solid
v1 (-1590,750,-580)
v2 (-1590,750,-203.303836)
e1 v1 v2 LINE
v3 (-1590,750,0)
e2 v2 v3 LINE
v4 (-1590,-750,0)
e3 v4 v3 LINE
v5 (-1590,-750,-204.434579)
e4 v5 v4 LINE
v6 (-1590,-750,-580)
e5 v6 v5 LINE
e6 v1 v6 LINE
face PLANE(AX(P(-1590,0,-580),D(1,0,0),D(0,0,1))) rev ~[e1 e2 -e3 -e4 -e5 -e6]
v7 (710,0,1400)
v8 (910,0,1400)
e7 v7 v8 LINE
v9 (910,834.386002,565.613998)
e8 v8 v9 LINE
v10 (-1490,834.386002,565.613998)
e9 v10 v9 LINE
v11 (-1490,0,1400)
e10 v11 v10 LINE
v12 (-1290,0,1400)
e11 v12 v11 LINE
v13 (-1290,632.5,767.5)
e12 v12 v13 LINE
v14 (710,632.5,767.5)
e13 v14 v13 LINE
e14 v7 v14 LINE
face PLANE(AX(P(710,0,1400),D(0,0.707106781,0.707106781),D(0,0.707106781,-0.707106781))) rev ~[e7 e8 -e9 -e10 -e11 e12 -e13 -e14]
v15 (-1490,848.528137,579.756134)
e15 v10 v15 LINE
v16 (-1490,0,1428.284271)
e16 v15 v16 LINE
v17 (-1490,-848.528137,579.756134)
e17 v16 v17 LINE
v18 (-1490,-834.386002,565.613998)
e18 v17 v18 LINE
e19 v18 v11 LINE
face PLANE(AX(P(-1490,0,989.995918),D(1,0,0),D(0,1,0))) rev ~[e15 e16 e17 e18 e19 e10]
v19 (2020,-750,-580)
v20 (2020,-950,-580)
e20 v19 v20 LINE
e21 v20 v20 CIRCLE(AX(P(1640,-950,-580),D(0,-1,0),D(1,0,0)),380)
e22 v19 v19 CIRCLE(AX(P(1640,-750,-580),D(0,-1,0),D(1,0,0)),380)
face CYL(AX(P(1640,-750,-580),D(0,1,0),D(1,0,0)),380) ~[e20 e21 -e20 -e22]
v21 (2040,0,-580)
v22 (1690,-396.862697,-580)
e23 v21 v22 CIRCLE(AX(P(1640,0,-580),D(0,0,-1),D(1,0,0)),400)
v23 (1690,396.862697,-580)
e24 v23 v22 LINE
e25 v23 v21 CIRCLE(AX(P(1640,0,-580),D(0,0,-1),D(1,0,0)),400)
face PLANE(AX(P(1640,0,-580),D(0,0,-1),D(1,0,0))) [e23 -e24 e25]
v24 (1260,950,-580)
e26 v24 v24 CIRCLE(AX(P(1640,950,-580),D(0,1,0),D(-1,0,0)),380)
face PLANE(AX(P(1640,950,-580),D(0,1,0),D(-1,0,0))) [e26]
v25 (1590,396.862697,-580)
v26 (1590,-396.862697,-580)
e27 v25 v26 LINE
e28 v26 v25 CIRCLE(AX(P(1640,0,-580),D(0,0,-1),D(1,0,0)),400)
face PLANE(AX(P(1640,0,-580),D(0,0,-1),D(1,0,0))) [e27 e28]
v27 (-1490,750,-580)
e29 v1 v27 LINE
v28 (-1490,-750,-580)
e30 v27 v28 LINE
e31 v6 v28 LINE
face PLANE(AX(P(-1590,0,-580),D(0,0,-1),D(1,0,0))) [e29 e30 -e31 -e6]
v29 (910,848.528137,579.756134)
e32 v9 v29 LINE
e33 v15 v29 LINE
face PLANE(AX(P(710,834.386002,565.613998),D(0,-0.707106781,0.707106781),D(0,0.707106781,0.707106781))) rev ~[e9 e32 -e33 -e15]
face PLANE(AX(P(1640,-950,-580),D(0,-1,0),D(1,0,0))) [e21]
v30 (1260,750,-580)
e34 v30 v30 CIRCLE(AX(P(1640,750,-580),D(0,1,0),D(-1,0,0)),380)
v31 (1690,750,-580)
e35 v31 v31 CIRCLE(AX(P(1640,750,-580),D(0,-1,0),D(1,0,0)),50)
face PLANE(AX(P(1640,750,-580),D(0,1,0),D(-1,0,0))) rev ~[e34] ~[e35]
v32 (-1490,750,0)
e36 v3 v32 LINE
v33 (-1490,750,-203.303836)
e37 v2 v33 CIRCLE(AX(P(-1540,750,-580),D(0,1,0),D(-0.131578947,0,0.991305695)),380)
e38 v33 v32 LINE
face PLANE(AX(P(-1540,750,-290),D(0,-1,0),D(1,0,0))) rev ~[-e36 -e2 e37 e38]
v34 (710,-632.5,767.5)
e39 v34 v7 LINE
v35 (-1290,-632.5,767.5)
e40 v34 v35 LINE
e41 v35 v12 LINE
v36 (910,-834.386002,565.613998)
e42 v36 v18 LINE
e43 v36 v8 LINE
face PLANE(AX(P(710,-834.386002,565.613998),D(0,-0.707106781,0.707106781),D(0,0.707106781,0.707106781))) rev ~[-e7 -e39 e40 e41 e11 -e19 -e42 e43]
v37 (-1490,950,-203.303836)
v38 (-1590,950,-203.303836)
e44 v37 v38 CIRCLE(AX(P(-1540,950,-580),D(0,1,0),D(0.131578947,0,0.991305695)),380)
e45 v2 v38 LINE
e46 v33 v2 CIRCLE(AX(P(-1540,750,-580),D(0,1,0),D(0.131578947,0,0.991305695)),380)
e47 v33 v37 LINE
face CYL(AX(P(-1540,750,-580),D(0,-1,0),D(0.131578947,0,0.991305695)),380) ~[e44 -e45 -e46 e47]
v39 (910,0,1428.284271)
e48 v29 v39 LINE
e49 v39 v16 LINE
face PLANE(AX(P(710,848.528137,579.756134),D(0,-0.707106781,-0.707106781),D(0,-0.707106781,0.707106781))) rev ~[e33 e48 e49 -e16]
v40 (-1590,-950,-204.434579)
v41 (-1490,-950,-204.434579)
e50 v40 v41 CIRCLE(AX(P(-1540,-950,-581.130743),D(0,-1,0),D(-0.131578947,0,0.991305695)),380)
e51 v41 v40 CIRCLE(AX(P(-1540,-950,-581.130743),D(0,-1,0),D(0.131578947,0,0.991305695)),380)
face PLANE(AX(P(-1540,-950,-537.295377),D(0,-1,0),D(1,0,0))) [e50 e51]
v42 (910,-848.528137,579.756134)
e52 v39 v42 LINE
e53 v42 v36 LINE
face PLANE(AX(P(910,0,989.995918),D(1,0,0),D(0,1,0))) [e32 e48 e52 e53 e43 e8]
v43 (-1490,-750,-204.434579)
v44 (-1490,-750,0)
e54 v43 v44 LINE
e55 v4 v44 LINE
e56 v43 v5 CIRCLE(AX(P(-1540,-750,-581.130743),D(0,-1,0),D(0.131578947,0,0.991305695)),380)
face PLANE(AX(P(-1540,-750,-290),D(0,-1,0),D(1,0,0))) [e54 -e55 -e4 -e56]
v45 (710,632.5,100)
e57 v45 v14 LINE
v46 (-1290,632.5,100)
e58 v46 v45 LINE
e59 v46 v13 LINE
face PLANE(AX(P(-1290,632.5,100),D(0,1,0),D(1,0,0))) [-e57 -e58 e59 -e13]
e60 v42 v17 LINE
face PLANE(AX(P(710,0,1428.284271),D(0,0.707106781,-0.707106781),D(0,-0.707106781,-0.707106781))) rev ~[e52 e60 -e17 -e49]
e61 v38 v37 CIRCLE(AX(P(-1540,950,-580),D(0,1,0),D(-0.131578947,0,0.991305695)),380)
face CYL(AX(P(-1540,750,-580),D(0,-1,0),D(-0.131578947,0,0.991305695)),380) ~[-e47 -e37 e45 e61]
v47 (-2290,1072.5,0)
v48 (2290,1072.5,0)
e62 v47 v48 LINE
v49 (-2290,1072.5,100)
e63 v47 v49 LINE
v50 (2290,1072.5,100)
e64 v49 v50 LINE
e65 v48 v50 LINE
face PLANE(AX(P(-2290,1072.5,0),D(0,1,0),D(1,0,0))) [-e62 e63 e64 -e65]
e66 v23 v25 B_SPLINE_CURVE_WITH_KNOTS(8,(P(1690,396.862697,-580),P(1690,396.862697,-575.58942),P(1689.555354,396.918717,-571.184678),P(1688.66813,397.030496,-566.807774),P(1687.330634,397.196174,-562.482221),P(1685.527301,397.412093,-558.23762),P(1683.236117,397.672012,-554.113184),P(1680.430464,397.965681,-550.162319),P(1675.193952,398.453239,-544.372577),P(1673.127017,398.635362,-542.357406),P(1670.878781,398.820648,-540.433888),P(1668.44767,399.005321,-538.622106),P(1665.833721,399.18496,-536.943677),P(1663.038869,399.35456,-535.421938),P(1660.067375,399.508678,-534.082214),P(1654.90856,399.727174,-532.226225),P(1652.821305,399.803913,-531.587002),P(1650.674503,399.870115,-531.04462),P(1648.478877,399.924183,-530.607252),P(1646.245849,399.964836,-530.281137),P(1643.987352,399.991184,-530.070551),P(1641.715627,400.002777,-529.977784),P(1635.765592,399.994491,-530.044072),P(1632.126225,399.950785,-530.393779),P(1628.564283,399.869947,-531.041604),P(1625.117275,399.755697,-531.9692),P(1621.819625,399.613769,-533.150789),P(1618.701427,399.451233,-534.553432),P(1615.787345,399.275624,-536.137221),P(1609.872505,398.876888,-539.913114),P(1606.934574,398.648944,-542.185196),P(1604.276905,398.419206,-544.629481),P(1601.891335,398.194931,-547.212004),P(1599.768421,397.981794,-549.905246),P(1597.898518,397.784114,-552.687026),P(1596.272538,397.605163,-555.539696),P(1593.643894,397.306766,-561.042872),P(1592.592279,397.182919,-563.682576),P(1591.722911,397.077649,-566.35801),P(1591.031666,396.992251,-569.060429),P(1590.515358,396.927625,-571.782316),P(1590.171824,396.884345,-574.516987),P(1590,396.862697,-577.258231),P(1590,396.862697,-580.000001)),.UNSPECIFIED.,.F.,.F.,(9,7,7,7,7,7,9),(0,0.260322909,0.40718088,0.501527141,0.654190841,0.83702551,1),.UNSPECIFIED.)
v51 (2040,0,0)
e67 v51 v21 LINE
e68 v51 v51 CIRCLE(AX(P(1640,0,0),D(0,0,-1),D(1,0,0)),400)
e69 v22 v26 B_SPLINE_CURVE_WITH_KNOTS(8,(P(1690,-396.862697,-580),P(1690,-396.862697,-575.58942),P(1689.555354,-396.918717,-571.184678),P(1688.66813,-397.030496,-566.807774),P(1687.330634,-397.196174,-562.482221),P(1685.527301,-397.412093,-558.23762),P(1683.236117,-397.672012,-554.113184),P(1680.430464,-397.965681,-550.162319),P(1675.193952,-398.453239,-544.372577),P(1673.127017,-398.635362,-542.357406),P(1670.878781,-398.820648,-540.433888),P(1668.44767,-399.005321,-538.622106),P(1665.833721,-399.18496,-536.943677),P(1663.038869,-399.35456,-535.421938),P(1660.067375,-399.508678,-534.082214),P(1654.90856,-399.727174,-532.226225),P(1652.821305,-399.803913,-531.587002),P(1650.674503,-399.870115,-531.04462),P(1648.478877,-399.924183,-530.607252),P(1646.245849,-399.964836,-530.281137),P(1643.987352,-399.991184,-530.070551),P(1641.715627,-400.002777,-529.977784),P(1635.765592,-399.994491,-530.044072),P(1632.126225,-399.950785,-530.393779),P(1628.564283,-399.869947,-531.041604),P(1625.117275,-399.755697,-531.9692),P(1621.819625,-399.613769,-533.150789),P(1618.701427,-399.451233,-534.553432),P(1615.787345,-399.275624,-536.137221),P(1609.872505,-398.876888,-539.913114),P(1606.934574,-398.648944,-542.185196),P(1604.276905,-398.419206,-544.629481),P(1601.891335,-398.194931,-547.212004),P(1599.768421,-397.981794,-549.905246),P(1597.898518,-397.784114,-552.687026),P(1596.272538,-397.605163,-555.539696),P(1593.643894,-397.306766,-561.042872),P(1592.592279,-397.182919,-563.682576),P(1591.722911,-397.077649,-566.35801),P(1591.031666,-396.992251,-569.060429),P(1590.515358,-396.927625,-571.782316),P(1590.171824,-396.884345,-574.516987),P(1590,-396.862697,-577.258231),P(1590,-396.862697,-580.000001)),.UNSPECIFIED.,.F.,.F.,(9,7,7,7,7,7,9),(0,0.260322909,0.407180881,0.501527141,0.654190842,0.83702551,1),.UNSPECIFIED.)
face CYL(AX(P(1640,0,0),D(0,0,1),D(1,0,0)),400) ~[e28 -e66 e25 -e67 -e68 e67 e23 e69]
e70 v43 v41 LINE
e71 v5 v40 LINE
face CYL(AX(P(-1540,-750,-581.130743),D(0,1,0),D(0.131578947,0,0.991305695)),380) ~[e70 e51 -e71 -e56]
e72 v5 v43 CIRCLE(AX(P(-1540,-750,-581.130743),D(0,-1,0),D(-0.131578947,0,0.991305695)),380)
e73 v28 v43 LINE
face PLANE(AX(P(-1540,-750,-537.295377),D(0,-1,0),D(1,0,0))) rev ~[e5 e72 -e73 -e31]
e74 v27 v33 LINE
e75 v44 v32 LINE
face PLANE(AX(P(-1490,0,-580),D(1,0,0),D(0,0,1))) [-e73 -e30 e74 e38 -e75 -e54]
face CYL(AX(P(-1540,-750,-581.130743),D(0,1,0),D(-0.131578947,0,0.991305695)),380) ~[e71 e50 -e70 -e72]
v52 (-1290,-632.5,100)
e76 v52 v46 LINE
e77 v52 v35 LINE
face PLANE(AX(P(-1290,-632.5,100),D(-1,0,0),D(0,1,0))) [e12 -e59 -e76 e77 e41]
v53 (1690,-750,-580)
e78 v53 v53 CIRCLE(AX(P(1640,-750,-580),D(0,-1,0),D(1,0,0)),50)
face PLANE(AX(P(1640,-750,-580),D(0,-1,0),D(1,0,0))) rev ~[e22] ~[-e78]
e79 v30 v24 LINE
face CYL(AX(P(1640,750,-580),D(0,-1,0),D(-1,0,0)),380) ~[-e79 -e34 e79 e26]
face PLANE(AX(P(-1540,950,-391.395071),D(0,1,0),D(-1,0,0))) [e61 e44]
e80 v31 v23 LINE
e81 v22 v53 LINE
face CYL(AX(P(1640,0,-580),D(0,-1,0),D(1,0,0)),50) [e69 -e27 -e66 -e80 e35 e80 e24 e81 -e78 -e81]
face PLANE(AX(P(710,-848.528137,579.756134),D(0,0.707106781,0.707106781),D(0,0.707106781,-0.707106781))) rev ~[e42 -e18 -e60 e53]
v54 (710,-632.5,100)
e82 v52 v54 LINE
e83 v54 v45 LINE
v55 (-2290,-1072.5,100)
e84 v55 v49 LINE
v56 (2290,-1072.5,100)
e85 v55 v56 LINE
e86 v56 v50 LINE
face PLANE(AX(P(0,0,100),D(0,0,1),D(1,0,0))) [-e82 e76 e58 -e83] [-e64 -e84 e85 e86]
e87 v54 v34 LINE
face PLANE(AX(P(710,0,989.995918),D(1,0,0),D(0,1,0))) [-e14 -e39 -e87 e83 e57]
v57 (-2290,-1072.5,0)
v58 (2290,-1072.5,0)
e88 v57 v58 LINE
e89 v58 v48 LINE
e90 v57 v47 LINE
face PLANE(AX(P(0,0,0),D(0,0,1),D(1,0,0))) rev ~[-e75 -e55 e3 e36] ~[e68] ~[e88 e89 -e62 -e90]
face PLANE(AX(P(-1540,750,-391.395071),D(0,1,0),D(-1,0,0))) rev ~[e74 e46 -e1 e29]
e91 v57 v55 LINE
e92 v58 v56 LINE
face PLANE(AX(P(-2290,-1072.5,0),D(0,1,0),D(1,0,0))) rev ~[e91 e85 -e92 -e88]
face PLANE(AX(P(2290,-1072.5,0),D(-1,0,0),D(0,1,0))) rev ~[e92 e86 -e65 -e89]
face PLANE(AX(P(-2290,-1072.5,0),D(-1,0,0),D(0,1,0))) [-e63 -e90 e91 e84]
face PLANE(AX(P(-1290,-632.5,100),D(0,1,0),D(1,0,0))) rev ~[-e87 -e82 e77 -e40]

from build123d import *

# Parameters (mm, degrees)
F0_W      = 4580
F0_H      = 2145
F1_DEPTH  = 100
F2_W      = 100
F2_H      = 580
F3_DEPTH  = 450
F4_DEPTH  = 750
F6_DEPTH  = 200
F8_DEPTH  = 200
F9_R      = 400
F10_DEPTH = 580
F11_R     = 50
F12_DEPTH = 750
F13_R     = 380
F13_R_2   = 50
F14_DEPTH = 200
F15_R     = 380
F15_R_2   = 50
F16_DEPTH = 200
F17_W     = 2000
F17_H     = 1265
F18_DEPTH = 2000
F20_DEPTH = 2000
F22_DEPTH = 2200
F23_DEPTH = 200


# Not quite as in the source:
# - a feature names something its author has since deleted; it is built from what else it names


with BuildPart() as f1:
    # F0 (on Top) → F1 (new body)
    with BuildSketch(Plane.XY):
        Rectangle(F0_W, F0_H)
    extrude(amount=F1_DEPTH)

    # F2 (on Front) → F3 (join, symmetric)
    with BuildSketch(Plane.XZ):
        with Locations((-1540, -290)):
            Rectangle(F2_W, F2_H)
    extrude(amount=F3_DEPTH, both=True)

    # F2 (on Front) → F4 (join, symmetric)
    with BuildSketch(Plane.XZ):
        with Locations((-1540, -290)):
            Rectangle(F2_W, F2_H)
    extrude(amount=F4_DEPTH, both=True)

    # F5 (on face) → F6 (join)
    with BuildSketch(Plane.XZ.offset(750)):
        with BuildLine():
            ThreePointArc((-1590, -204.43457899), (-1790.399680511, -866.9628615859), (-1160, -581.1307430267))
            ThreePointArc((-1160, -581.1307430267), (-1254.1678814409, -330.7310625158), (-1490, -204.43457899))
            Line((-1490, -204.43457899), (-1490, -580))
            Line((-1490, -580), (-1590, -580))
            Line((-1590, -580), (-1590, -204.43457899))
        make_face()
        with BuildLine():
            Line((-1490, -580), (-1490, -204.43457899))
            ThreePointArc((-1490, -204.43457899), (-1540, -201.1307430267), (-1590, -204.43457899))
            Line((-1590, -204.43457899), (-1590, -580))
            Line((-1590, -580), (-1490, -580))
        make_face()
    extrude(amount=F6_DEPTH)

    # F7 (on face) → F8 (join)
    with BuildSketch(Plane(origin=(0, 750, 0), x_dir=(-1, 0, 0), z_dir=(0, 1, 0))):
        with BuildLine():
            Line((1590, -580), (1590, -203.3038359633))
            ThreePointArc((1590, -203.3038359633), (1540, -200), (1490, -203.3038359633))
            Line((1490, -203.3038359633), (1490, -580))
            Line((1490, -580), (1590, -580))
        make_face()
        with BuildLine():
            ThreePointArc((1490, -203.3038359633), (1289.600319489, -865.8321185591), (1920, -580))
            ThreePointArc((1920, -580), (1825.8321185591, -329.600319489), (1590, -203.3038359633))
            Line((1590, -203.3038359633), (1590, -580))
            Line((1590, -580), (1490, -580))
            Line((1490, -580), (1490, -203.3038359633))
        make_face()
    extrude(amount=F8_DEPTH)

    # F9 (on face) → F10 (join)
    with BuildSketch(Plane(origin=(0, 0, 0), x_dir=(1, 0, 0), z_dir=(0, 0, -1))):
        with Locations((1640, 0)):
            Circle(F9_R)
    extrude(amount=F10_DEPTH)

    # F11 (on Front) → F12 (join, symmetric)
    with BuildSketch(Plane.XZ):
        with Locations((1640, -580)):
            Circle(F11_R)
    extrude(amount=F12_DEPTH, both=True)

    # F13 (on face) → F14 (join)
    with BuildSketch(Plane.XZ.offset(750)):
        with Locations((1640, -580)):
            Circle(F13_R)
        with Locations((1640, -580)):
            Circle(F13_R_2, mode=Mode.SUBTRACT)
        with Locations((1640, -580)):
            Circle(F13_R_2)
    extrude(amount=F14_DEPTH)

    # F15 (on face) → F16 (join)
    with BuildSketch(Plane(origin=(0, 750, 0), x_dir=(-1, 0, 0), z_dir=(0, 1, 0))):
        with Locations((-1640, -580)):
            Circle(F15_R)
        with Locations((-1640, -580)):
            Circle(F15_R_2, mode=Mode.SUBTRACT)
        with Locations((-1640, -580)):
            Circle(F15_R_2)
    extrude(amount=F16_DEPTH)

    # F17 (on face) → F18 (join)
    with BuildSketch(Plane.XY.offset(100)):
        with Locations((-290, 0)):
            Rectangle(F17_W, F17_H)
    extrude(amount=F18_DEPTH)

    # F19 (on face) → F20 (cut)
    with BuildSketch(Plane.YZ.offset(710)):
        Polygon((-824.2233241082, 575.7766758918), (-632.5, 767.5), (-632.5, 2100), (632.5, 2100), (632.5, 767.5), (998.3408662269, 401.6591337731), (998.3408662269, 2239.1670500755), (-824.2233241082, 2239.1670500755), align=None)
        Polygon((-632.5, 767.5), (0, 1400), (632.5, 767.5), (632.5, 2100), (-632.5, 2100), align=None)
    extrude(amount=-F20_DEPTH, mode=Mode.SUBTRACT)

    # F21 (on face) → F22 (join)
    with BuildSketch(Plane.YZ.offset(710)):
        Polygon((-632.5, 767.5), (0, 1400), (632.5, 767.5), (834.3860018001, 565.6139981999), (848.5281374239, 579.7561338236), (0, 1428.2842712475), (-848.5281374239, 579.7561338236), (-834.3860018001, 565.6139981999), align=None)
    extrude(amount=-F22_DEPTH)

    # F21 (on face) → F23 (join)
    with BuildSketch(Plane.YZ.offset(710)):
        Polygon((-834.3860018001, 565.6139981999), (0, 1400), (834.3860018001, 565.6139981999), (848.5281374239, 579.7561338236), (0, 1428.2842712475), (-848.5281374239, 579.7561338236), align=None)
    extrude(amount=F23_DEPTH)


solid = f1.part
